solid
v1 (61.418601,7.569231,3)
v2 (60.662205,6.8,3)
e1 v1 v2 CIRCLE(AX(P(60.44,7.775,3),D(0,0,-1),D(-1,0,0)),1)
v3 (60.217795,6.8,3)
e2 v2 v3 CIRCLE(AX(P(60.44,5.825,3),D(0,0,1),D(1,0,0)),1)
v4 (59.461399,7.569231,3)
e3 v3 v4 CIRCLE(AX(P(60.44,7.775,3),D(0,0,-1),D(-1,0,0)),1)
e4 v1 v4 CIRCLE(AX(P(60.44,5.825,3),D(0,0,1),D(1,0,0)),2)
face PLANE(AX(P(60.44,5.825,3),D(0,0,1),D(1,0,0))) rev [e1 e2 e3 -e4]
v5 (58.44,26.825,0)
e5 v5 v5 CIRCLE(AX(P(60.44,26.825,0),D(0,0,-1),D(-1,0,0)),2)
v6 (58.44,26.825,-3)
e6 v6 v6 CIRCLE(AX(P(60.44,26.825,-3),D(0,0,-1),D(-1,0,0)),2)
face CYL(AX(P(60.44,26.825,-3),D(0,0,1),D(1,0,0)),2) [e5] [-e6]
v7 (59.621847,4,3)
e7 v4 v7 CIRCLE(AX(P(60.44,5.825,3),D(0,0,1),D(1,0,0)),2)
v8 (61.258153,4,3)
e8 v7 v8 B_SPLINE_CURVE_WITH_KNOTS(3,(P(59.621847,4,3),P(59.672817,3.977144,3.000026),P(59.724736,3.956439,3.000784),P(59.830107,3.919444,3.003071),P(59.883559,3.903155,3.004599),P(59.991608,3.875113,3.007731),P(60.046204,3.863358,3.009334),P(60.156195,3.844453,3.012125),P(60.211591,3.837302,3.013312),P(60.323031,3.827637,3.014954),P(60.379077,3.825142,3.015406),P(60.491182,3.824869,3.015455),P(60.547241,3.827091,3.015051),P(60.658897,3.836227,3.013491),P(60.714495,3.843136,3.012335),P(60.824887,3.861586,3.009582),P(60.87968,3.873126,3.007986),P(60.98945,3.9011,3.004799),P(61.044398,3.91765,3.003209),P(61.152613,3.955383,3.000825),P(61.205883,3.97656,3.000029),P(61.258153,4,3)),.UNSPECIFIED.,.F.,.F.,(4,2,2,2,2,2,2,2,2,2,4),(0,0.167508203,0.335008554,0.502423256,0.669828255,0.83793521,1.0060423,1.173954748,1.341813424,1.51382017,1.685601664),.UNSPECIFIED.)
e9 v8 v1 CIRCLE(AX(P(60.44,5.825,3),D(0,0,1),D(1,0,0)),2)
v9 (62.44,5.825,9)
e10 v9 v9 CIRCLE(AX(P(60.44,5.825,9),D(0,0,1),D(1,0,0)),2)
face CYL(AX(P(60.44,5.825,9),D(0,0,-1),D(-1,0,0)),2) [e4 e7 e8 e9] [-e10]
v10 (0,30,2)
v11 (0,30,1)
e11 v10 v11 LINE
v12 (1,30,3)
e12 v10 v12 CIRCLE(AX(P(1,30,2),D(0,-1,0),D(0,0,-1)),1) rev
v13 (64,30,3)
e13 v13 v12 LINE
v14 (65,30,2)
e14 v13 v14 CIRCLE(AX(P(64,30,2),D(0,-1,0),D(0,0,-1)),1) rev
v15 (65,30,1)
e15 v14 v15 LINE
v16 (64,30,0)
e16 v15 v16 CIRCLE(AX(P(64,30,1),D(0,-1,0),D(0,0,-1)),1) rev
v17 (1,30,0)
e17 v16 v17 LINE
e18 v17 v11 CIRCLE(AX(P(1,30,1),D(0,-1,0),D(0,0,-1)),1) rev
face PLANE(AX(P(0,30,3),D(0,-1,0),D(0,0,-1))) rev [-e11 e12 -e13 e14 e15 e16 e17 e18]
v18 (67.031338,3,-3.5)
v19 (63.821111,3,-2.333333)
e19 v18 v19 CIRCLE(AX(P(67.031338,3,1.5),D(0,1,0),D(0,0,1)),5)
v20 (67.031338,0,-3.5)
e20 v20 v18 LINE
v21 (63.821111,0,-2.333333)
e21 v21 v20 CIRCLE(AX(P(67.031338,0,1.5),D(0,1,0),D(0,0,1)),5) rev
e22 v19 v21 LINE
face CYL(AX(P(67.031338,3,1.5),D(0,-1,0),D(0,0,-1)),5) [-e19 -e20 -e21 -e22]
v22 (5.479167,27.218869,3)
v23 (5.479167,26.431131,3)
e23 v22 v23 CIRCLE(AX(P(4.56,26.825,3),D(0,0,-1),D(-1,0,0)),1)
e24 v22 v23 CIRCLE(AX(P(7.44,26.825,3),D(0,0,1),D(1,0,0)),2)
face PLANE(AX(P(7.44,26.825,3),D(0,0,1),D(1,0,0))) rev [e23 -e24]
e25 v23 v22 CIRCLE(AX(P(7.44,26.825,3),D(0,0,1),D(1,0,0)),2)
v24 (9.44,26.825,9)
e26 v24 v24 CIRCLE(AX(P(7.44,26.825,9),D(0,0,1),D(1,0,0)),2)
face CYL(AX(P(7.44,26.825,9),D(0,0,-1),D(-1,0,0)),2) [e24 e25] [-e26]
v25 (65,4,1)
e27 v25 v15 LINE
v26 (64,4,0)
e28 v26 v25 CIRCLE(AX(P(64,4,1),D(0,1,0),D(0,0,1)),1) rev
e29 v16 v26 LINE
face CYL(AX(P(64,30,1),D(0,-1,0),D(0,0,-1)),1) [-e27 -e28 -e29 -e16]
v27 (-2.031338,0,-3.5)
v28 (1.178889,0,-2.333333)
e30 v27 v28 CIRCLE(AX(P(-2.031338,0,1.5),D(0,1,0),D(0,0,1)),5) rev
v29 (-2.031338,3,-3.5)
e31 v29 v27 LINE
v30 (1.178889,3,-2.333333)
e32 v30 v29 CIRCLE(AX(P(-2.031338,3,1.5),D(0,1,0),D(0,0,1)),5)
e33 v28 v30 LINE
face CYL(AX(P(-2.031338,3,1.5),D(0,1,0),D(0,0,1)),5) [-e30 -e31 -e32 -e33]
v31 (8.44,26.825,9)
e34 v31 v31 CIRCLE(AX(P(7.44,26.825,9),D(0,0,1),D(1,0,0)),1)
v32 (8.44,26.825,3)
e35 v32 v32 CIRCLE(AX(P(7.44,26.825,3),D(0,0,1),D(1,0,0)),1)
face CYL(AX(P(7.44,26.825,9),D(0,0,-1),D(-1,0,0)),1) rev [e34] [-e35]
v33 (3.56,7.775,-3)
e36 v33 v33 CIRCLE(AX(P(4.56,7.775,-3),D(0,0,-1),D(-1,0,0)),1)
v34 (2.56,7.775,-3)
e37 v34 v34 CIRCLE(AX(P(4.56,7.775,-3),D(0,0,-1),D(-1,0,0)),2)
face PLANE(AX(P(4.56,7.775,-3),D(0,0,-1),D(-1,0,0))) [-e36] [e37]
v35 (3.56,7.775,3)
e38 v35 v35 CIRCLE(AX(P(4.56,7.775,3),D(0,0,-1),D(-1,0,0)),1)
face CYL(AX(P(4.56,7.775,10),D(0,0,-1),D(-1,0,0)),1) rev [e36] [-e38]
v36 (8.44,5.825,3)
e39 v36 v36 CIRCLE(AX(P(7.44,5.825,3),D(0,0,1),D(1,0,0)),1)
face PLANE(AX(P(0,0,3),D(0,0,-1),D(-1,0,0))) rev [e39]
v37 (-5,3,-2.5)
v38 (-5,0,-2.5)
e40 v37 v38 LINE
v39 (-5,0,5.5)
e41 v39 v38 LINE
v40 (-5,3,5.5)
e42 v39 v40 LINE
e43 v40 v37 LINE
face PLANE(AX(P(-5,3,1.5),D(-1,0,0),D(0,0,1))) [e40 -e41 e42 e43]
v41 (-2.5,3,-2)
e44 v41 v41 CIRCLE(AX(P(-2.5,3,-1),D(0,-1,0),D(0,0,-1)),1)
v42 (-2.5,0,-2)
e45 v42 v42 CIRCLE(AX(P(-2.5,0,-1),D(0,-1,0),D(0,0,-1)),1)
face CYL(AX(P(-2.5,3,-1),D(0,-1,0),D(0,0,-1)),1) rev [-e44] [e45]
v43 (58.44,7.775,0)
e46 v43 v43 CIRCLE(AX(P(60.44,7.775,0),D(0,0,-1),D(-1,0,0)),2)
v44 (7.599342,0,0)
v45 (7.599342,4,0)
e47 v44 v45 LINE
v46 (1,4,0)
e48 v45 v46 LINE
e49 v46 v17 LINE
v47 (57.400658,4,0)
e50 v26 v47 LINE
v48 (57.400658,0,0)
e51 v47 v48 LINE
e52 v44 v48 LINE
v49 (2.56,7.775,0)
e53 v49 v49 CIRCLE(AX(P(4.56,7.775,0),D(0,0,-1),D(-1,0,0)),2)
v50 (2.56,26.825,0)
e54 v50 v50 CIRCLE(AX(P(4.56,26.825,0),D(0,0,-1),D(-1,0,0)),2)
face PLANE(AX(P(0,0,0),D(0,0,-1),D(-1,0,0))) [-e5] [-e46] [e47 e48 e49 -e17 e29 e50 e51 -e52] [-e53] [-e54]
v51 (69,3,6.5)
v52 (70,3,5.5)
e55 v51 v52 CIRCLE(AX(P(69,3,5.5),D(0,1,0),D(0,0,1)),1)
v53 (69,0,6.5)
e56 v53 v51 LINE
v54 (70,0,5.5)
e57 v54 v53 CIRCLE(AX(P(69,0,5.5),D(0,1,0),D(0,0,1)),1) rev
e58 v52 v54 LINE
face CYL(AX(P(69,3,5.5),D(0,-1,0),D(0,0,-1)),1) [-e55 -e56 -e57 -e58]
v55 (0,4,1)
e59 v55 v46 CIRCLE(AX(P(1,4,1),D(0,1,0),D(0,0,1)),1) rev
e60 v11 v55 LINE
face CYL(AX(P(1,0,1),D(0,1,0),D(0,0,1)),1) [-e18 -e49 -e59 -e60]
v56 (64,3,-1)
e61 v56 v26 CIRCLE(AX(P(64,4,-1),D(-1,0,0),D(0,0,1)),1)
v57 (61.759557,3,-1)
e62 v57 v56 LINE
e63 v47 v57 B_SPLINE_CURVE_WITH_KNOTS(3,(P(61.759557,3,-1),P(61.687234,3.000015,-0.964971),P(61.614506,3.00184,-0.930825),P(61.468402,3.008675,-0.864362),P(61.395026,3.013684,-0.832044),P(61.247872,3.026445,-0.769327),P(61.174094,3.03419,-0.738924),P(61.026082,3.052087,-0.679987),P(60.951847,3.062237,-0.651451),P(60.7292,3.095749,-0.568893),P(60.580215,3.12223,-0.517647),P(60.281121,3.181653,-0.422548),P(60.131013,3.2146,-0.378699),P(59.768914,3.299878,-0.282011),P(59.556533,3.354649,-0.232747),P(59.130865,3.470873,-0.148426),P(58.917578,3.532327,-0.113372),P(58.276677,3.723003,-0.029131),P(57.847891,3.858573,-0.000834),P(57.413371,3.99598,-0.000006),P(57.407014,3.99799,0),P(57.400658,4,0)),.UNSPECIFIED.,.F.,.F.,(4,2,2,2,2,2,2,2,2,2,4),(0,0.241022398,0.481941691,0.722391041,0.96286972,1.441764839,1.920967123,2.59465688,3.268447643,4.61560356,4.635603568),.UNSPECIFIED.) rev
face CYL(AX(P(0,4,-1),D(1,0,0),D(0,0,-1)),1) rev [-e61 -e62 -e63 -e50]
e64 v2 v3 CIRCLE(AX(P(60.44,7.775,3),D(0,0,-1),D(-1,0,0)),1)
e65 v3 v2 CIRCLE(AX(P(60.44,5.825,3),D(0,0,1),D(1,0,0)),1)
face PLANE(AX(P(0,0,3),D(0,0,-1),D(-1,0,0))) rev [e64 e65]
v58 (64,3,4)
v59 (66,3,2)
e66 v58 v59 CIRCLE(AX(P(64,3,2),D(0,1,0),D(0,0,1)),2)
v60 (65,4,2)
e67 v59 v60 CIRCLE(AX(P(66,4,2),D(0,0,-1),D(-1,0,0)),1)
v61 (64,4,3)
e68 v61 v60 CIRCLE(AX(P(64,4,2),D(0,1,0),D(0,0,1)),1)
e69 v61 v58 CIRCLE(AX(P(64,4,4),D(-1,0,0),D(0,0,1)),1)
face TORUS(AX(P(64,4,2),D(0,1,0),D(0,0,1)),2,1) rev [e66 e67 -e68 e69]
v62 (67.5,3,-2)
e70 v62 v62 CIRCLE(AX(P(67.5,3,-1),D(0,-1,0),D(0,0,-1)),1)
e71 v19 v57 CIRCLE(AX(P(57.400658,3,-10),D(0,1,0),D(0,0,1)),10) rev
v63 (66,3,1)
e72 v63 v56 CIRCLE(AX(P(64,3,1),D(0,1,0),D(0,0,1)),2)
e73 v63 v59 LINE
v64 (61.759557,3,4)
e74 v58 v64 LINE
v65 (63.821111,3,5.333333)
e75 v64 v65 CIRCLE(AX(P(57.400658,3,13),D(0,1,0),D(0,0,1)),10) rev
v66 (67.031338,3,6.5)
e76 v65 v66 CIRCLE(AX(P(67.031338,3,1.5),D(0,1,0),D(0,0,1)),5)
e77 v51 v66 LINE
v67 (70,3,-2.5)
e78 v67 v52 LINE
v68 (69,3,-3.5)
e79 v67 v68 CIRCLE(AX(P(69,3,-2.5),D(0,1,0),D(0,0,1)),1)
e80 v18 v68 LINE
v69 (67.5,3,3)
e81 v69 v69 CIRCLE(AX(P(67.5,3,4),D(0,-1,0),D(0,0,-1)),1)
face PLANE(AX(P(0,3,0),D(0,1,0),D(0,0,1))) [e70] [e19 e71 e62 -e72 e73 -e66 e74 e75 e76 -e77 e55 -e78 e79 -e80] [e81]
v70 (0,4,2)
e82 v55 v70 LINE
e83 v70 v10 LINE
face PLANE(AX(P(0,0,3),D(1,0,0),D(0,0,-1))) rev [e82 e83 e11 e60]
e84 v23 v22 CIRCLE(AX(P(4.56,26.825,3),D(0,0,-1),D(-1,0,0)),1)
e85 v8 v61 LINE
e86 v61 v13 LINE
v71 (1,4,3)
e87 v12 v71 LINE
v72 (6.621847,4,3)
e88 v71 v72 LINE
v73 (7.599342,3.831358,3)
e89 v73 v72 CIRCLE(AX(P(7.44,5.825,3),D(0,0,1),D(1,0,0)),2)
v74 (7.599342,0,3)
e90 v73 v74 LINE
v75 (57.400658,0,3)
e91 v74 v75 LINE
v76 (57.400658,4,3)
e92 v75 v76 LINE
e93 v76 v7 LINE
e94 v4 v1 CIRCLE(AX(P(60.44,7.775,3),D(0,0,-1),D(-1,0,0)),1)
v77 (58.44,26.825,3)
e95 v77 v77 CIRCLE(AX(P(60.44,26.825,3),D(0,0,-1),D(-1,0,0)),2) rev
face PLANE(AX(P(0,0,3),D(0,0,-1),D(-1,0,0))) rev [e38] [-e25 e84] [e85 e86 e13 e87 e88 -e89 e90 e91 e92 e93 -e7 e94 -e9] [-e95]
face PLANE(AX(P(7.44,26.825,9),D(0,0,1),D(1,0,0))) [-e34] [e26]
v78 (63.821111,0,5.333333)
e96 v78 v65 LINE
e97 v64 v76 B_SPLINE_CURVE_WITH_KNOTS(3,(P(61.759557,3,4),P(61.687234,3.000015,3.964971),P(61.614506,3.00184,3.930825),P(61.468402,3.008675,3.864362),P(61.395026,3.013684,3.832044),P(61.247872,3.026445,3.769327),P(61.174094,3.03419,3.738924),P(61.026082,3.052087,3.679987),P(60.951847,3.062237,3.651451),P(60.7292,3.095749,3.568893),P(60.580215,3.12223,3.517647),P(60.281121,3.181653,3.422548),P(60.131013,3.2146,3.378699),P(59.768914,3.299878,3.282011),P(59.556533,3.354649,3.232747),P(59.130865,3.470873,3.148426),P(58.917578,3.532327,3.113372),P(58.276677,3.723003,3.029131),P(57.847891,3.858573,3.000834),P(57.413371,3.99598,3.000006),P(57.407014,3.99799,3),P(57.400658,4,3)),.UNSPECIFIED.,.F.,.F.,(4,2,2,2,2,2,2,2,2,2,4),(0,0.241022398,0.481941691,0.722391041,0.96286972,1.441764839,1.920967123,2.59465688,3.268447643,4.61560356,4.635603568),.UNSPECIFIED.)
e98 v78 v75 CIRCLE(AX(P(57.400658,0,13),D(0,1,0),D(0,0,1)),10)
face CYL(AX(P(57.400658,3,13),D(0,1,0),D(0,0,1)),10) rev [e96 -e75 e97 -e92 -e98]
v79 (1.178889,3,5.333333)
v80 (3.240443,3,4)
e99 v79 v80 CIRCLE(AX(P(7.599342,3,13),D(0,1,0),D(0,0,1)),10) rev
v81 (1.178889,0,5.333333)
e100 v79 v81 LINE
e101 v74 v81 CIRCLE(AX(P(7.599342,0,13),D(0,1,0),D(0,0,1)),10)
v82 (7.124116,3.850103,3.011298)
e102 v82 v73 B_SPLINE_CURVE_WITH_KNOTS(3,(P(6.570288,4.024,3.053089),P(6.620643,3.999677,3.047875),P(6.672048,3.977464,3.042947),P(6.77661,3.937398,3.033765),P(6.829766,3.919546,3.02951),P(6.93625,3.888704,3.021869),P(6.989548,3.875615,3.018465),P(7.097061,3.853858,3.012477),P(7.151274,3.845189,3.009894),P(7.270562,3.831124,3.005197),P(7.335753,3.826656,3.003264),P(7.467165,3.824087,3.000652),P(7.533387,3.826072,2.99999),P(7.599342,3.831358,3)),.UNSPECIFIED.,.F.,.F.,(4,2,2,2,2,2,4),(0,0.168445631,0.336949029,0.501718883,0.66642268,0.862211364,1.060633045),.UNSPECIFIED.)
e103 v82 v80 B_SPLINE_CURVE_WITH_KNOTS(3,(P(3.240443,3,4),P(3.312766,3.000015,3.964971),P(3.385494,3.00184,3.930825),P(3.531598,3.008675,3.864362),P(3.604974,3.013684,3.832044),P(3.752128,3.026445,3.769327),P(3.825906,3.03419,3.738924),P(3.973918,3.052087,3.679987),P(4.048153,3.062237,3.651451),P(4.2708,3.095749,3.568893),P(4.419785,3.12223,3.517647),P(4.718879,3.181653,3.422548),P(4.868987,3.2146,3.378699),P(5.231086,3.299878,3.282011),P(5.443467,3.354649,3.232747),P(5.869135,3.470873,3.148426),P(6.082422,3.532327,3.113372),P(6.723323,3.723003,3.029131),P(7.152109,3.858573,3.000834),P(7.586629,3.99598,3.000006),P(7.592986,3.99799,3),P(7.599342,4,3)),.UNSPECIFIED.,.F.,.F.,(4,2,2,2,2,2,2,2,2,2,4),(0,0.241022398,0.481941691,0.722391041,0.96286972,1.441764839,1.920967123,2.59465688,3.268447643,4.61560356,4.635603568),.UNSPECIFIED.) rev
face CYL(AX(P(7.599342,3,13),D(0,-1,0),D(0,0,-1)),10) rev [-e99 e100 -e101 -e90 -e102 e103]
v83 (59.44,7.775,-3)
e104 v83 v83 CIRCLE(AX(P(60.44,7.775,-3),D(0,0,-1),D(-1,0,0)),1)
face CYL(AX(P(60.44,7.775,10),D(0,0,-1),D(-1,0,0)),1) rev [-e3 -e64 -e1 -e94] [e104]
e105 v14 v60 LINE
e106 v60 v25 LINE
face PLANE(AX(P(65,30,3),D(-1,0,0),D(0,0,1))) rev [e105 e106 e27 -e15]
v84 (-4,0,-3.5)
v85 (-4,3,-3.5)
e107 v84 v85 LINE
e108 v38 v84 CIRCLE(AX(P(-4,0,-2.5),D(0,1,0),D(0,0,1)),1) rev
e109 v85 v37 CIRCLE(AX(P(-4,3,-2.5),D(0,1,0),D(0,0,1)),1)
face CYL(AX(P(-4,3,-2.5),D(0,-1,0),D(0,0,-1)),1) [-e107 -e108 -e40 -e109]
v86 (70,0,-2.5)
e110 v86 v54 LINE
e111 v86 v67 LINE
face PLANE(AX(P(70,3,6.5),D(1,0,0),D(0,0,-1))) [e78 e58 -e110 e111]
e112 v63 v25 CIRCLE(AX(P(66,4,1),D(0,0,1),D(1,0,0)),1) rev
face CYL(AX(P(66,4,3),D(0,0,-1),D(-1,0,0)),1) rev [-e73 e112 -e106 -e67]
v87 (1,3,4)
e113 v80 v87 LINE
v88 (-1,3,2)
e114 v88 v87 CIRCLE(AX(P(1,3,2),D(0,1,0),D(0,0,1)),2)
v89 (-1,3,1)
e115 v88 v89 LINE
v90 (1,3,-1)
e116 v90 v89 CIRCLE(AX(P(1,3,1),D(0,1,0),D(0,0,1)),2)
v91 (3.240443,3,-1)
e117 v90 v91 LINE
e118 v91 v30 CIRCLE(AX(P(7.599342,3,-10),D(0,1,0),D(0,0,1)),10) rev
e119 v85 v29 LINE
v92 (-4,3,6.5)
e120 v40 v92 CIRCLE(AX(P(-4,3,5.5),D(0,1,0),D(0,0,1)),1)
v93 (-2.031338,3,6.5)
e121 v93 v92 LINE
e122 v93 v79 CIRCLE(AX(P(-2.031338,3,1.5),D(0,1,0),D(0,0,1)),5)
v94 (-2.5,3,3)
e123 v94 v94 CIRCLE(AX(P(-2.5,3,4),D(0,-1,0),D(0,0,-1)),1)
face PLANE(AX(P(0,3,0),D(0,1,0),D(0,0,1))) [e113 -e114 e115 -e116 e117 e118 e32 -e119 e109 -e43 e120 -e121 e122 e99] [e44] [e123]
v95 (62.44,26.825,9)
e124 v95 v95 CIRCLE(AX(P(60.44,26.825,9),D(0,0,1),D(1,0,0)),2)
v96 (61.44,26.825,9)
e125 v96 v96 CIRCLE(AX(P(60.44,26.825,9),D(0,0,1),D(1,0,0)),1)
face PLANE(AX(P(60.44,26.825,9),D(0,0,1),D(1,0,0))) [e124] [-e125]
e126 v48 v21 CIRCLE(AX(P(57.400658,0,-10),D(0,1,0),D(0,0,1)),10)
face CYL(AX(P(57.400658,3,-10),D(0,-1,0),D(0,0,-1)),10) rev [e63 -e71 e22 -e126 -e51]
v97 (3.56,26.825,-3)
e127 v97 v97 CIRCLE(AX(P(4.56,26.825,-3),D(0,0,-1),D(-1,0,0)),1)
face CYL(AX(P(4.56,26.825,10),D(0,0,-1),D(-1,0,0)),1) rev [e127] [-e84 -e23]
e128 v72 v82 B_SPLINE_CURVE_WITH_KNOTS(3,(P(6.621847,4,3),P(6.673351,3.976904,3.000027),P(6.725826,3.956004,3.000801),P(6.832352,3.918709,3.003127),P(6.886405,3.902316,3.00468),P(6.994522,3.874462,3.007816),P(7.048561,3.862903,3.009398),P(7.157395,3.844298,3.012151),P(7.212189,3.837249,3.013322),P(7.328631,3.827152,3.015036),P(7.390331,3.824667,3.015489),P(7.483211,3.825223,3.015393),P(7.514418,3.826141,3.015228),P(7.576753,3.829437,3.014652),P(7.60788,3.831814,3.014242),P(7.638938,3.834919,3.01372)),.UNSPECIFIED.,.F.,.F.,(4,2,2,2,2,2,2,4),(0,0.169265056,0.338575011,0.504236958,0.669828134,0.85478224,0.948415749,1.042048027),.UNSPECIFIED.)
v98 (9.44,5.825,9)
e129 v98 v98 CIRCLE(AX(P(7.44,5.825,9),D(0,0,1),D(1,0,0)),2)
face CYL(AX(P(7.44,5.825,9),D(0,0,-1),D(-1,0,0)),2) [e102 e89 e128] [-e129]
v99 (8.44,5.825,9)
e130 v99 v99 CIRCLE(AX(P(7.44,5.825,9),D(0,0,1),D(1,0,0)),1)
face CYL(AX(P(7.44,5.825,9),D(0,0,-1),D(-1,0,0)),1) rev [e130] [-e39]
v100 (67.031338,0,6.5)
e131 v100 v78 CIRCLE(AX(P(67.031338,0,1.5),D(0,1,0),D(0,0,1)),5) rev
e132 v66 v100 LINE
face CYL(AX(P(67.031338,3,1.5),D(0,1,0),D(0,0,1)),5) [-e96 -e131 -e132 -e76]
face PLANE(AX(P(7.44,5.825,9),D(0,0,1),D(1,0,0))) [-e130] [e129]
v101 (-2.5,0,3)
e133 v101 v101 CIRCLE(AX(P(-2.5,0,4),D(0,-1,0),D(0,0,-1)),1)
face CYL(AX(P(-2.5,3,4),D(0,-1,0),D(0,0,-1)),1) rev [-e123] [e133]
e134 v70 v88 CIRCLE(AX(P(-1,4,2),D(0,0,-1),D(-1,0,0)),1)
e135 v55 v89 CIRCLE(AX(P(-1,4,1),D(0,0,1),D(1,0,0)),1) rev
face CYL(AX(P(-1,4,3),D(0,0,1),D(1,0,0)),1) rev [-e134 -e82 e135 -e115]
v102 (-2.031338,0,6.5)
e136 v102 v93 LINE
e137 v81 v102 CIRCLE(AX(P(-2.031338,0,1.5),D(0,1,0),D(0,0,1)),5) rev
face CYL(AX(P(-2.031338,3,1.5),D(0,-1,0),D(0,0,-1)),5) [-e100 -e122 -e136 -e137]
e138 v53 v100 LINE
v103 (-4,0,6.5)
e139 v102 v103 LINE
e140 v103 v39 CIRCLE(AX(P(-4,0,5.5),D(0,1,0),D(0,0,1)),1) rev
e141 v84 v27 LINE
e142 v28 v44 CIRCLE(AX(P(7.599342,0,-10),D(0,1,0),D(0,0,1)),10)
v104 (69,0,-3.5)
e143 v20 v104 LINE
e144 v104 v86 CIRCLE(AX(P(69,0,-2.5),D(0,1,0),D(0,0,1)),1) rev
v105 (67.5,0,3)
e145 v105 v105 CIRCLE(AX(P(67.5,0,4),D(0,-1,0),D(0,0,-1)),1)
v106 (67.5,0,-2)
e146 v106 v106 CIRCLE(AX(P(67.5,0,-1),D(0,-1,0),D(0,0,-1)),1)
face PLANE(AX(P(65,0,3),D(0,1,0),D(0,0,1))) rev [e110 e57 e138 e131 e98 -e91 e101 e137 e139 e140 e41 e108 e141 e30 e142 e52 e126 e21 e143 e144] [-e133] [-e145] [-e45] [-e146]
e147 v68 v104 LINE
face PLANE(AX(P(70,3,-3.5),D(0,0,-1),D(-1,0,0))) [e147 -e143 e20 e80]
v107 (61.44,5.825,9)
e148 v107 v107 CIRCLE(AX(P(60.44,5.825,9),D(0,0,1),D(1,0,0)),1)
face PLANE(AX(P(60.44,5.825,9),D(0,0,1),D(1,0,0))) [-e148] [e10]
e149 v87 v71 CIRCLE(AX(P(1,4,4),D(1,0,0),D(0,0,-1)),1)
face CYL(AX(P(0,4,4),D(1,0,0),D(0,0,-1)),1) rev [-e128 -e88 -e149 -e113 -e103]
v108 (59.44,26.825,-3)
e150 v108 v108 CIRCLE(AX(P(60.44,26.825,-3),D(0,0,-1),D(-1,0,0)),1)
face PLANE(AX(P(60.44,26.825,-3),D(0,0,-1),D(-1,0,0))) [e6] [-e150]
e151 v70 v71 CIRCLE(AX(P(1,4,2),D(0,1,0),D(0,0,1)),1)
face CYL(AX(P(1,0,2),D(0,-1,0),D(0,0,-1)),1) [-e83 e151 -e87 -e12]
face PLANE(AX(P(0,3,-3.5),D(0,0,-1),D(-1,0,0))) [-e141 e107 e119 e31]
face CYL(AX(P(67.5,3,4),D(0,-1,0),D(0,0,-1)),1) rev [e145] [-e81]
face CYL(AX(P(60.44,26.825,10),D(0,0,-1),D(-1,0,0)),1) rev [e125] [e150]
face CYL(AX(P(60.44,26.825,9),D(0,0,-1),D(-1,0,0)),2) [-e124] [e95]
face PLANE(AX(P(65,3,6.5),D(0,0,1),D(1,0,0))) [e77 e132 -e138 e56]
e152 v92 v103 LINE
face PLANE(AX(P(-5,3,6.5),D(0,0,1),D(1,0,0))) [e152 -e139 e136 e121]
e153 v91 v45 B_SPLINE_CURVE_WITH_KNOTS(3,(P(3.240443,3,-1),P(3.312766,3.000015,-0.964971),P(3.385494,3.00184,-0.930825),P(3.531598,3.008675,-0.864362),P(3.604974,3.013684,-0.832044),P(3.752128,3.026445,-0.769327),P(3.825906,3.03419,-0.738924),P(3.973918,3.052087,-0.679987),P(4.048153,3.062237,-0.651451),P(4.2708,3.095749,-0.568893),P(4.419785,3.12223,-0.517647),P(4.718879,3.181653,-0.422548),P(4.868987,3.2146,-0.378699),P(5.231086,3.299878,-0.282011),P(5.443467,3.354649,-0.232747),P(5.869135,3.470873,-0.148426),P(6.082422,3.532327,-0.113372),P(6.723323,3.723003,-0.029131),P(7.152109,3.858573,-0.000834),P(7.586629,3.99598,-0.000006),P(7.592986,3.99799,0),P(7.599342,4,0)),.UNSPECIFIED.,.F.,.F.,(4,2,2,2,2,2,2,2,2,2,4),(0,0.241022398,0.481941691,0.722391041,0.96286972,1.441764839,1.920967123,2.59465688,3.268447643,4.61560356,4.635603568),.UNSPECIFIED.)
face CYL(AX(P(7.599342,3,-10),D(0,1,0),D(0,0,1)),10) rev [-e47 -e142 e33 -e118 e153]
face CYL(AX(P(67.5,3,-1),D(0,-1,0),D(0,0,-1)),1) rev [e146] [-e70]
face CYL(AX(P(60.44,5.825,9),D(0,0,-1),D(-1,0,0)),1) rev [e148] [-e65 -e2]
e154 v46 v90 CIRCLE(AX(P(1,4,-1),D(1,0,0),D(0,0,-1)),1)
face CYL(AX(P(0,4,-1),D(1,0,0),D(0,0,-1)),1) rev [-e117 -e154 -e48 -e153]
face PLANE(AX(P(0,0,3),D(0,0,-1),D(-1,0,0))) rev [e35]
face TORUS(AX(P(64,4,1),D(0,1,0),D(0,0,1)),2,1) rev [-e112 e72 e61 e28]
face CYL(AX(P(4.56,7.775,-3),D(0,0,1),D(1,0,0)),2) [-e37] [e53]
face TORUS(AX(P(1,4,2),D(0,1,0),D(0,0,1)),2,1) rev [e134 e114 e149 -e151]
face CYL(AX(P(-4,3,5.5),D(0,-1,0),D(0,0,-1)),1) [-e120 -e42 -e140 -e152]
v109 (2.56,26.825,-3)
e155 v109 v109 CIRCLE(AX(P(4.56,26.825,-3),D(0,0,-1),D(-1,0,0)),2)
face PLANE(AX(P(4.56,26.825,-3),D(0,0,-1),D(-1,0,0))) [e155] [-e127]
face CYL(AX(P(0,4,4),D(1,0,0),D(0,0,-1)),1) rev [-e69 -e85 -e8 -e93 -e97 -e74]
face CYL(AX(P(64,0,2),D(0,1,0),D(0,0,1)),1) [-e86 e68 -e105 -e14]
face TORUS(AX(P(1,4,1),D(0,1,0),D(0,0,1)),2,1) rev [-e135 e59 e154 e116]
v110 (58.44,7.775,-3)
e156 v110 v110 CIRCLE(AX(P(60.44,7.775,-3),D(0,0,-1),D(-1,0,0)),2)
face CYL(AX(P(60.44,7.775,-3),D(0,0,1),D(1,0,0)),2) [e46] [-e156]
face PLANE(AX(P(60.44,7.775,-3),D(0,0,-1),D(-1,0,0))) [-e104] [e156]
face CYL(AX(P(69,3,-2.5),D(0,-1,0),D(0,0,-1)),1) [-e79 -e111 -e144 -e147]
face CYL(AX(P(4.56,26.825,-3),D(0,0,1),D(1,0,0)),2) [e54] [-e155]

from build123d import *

# Parameters (mm, degrees)
SKETCH2_W           = 65
SKETCH2_H           = 30.000000000000004
BOSS_EXTRUDE1_DEPTH = 3
SKETCH3_R           = 0.9999999999999981
SKETCH3_R_2         = 0.9999999999999983
SKETCH3_R_3         = 1.0000000000000002
BOSS_EXTRUDE2_DEPTH = 3
FILLET1_R           = 10
FILLET2_R           = 1
FILLET3_R           = 1
FILLET4_R           = 5
SKETCH4_R           = 1.0000000000000004
SKETCH4_R_2         = 0.9999999999999983
CUT_EXTRUDE1_DEPTH  = 10
BOSS_EXTRUDE3_START = 3
SKETCH5_R           = 2.000000000000001
SKETCH5_R_2         = 1.0000000000000004
SKETCH5_R_3         = 2.0000000000000004
SKETCH5_R_4         = 1.0000000000000009
SKETCH5_R_5         = 2.0000000000000036
SKETCH5_R_6         = 1.000000000000005
SKETCH5_R_7         = 2.0000000000000027
SKETCH5_R_8         = 0.9999999999999983
BOSS_EXTRUDE3_DEPTH = 3
SKETCH6_R           = 2.0000000000000036
SKETCH6_R_2         = 0.9999999999999983
SKETCH6_R_3         = 2.000000000000003
SKETCH6_R_4         = 0.9999999999999981
SKETCH6_R_5         = 2
SKETCH6_R_6         = 1.0000000000000018
SKETCH6_R_7         = 1.9999999999999987
SKETCH6_R_8         = 1.0000000000000007
BOSS_EXTRUDE4_DEPTH = 6


with BuildPart() as part:
    # Sketch2 → Boss-Extrude1 (new body)
    with BuildSketch(Plane.XY):
        with Locations((32.5, 15.000000000000002)):
            Rectangle(SKETCH2_W, SKETCH2_H)
    extrude(amount=BOSS_EXTRUDE1_DEPTH)

    # Sketch3 → Boss-Extrude2 (add)
    # profile 1 of 2: a face of its own
    with BuildSketch(Plane.XZ):
        Polygon((65, 1.5), (65, 6.500000000000001), (70, 6.500000000000001), (70, -3.4999999999999996), (65, -3.4999999999999996), align=None)
        with Locations(Location((67.5, 4, 0), (0, 0, 270))):
            Circle(SKETCH3_R, mode=Mode.SUBTRACT)
        with Locations(Location((67.5, -1, 0), (0, 0, 270))):
            Circle(SKETCH3_R_2, mode=Mode.SUBTRACT)
    # profile 2 of 2: a face of its own
    with BuildSketch(Plane.XZ):
        Polygon((-5, 1.4999999999999993), (-5, 6.5), (0, 6.5), (0, -3.5000000000000013), (-5, -3.5000000000000018), align=None)
        with Locations(Location((-2.5, 3.999999999999999, 0), (0, 0, 270))):
            Circle(SKETCH3_R_3, mode=Mode.SUBTRACT)
        with Locations(Location((-2.5, -1.0000000000000018, 0), (0, 0, 270))):
            Circle(SKETCH3_R_3, mode=Mode.SUBTRACT)
    extrude(amount=-BOSS_EXTRUDE2_DEPTH)

    # Fillet1
    # the kernel refuses this fillet: 10 mm, written as the material it adds along each edge
    with BuildSketch(Plane(origin=(65, 3, 3), x_dir=(-1, 0, 0), z_dir=(0, -1, 0))) as fillet1_piece_1:
        with BuildLine():
            CenterArc((7.599342076785334, -10), FILLET1_R, 90, 49.458398126495496)
            Line((0, -3.500000000000001), (0, 0))
            Line((0, 0), (7.599342076785334, 0))
        make_face()
    extrude(amount=3)
    with BuildSketch(Plane(origin=(65, 3, 0), x_dir=(-1, 0, 0), z_dir=(0, -1, 0))) as fillet1_piece_2:
        with BuildLine():
            CenterArc((7.599342076785334, 10), FILLET1_R, 220.5416018735045, 49.45839812649547)
            Line((0, 3.500000000000001), (0, 0))
            Line((0, 0), (7.599342076785334, 0))
        make_face()
    extrude(amount=3)
    with BuildSketch(Plane(origin=(0, 0, 0), x_dir=(1, 0, 0), z_dir=(0, 1, 0))) as fillet1_piece_3:
        with BuildLine():
            CenterArc((7.599342076785334, 10), FILLET1_R, 220.5416018735045, 49.45839812649547)
            Line((0, 3.5000000000000018), (0, 0))
            Line((0, 0), (7.599342076785334, 0))
        make_face()
    extrude(amount=3)
    with BuildSketch(Plane(origin=(0, 0, 3), x_dir=(1, 0, 0), z_dir=(0, 1, 0))) as fillet1_piece_4:
        with BuildLine():
            CenterArc((7.59934207678533, -10), FILLET1_R, 90, 49.45839812649547)
            Line((-1.78e-15, -3.4999999999999982), (0, 0))
            Line((0, 0), (7.59934207678533, 0))
        make_face()
    extrude(amount=3)

    # Fillet2
    fillet2_edges = [part.edges().sort_by_distance(p)[0] for p in [
        (70, 1.5, 6.500000000000001),
        (70, 1.5, -3.4999999999999996),
        (-5, 1.5, -3.5000000000000018),
        (-5, 1.5, 6.5),
    ]]
    fillet(fillet2_edges, radius=FILLET2_R)

    # Fillet3
    fillet3_edges = [part.edges().sort_by_distance(p)[0] for p in [
        (0, 3, 1.5),
        (65, 16.5, 0),
        (65, 16.5, 3),
        (65, 3, 1.5),
        (0, 16.5, 3),
        (0, 16.5, 0),
        (3.7996710383925, 3, 3),
        (61.2003289616075, 3, 3),
        (3.7996710383925, 3, 0),
        (61.2003289616075, 3, 0),
    ]]
    fillet(fillet3_edges, radius=FILLET3_R)

    # Fillet4
    fillet4_edges = [part.edges().sort_by_distance(p)[0] for p in [
        (65, 1.5, -3.4999999999999996),
        (65, 1.5, 6.500000000000001),
        (0, 1.5, 6.5),
        (0, 1.5, -3.5000000000000013),
    ]]
    fillet(fillet4_edges, radius=FILLET4_R)

    # Sketch4 → Cut-Extrude1 (cut)
    with BuildSketch(Plane(origin=(0, 0, 0), x_dir=(-1, 0, 0), z_dir=(0, 0, -1))):
        with Locations((-4.559999999999932, 26.825000000000006)):
            Circle(SKETCH4_R)
        with Locations((-60.439999999999934, 26.825000000000006)):
            Circle(SKETCH4_R_2)
        with Locations((-60.439999999999934, 7.775000000000004)):
            Circle(SKETCH4_R_2)
        with Locations((-4.559999999999932, 7.775000000000004)):
            Circle(SKETCH4_R)
    extrude(amount=-CUT_EXTRUDE1_DEPTH, mode=Mode.SUBTRACT)

    # Sketch5 → Boss-Extrude3 (add)
    # profile 1 of 4: a face of its own
    with BuildSketch(Plane(origin=(0, 0, 0), x_dir=(-1, 0, 0), z_dir=(0, 0, -1)).offset(BOSS_EXTRUDE3_START)):
        with Locations((-4.559999999999932, 26.825000000000006)):
            Circle(SKETCH5_R)
        with Locations((-4.559999999999932, 26.825000000000006)):
            Circle(SKETCH5_R_2, mode=Mode.SUBTRACT)
    # profile 2 of 4: a face of its own
    with BuildSketch(Plane(origin=(0, 0, 0), x_dir=(-1, 0, 0), z_dir=(0, 0, -1)).offset(BOSS_EXTRUDE3_START)):
        with Locations((-4.559999999999932, 7.775000000000004)):
            Circle(SKETCH5_R_3)
        with Locations((-4.559999999999932, 7.775000000000004)):
            Circle(SKETCH5_R_4, mode=Mode.SUBTRACT)
    # profile 3 of 4: a face of its own
    with BuildSketch(Plane(origin=(0, 0, 0), x_dir=(-1, 0, 0), z_dir=(0, 0, -1)).offset(BOSS_EXTRUDE3_START)):
        with Locations((-60.439999999999934, 26.825000000000006)):
            Circle(SKETCH5_R_5)
        with Locations((-60.439999999999934, 26.825000000000006)):
            Circle(SKETCH5_R_6, mode=Mode.SUBTRACT)
    # profile 4 of 4: a face of its own
    with BuildSketch(Plane(origin=(0, 0, 0), x_dir=(-1, 0, 0), z_dir=(0, 0, -1)).offset(BOSS_EXTRUDE3_START)):
        with Locations((-60.439999999999934, 7.775000000000004)):
            Circle(SKETCH5_R_7)
        with Locations((-60.439999999999934, 7.775000000000004)):
            Circle(SKETCH5_R_8, mode=Mode.SUBTRACT)
    extrude(amount=-BOSS_EXTRUDE3_DEPTH)

    # Sketch6 → Boss-Extrude4 (add)
    # profile 1 of 4: a face of its own
    with BuildSketch(Plane.XY.offset(3)):
        with Locations(Location((60.439999999999934, 26.825000000000006, 0), (0, 0, 180))):
            Circle(SKETCH6_R)
        with Locations(Location((60.439999999999934, 26.825000000000006, 0), (0, 0, 180))):
            Circle(SKETCH6_R_2, mode=Mode.SUBTRACT)
    # profile 2 of 4: a face of its own
    with BuildSketch(Plane.XY.offset(3)):
        with Locations(Location((60.439999999999934, 5.825000000000004, 0), (0, 0, 119.294600838))):
            Circle(SKETCH6_R_3)
        with Locations(Location((60.439999999999934, 5.825000000000004, 0), (0, 0, 102.838568141))):
            Circle(SKETCH6_R_4, mode=Mode.SUBTRACT)
    # profile 3 of 4: a face of its own
    with BuildSketch(Plane.XY.offset(3)):
        with Locations(Location((7.439999999999933, 26.825, 0), (0, 0, 191.357748332))):
            Circle(SKETCH6_R_5)
        with Locations((7.439999999999933, 26.825)):
            Circle(SKETCH6_R_6, mode=Mode.SUBTRACT)
    # profile 4 of 4: a face of its own
    with BuildSketch(Plane.XY.offset(3)):
        with Locations(Location((7.4399999999999356, 5.824999999999997, 0), (0, 0, 245.853152003))):
            Circle(SKETCH6_R_7)
        with Locations((7.4399999999999356, 5.824999999999997)):
            Circle(SKETCH6_R_8, mode=Mode.SUBTRACT)
    extrude(amount=BOSS_EXTRUDE4_DEPTH)


solid = part.part
